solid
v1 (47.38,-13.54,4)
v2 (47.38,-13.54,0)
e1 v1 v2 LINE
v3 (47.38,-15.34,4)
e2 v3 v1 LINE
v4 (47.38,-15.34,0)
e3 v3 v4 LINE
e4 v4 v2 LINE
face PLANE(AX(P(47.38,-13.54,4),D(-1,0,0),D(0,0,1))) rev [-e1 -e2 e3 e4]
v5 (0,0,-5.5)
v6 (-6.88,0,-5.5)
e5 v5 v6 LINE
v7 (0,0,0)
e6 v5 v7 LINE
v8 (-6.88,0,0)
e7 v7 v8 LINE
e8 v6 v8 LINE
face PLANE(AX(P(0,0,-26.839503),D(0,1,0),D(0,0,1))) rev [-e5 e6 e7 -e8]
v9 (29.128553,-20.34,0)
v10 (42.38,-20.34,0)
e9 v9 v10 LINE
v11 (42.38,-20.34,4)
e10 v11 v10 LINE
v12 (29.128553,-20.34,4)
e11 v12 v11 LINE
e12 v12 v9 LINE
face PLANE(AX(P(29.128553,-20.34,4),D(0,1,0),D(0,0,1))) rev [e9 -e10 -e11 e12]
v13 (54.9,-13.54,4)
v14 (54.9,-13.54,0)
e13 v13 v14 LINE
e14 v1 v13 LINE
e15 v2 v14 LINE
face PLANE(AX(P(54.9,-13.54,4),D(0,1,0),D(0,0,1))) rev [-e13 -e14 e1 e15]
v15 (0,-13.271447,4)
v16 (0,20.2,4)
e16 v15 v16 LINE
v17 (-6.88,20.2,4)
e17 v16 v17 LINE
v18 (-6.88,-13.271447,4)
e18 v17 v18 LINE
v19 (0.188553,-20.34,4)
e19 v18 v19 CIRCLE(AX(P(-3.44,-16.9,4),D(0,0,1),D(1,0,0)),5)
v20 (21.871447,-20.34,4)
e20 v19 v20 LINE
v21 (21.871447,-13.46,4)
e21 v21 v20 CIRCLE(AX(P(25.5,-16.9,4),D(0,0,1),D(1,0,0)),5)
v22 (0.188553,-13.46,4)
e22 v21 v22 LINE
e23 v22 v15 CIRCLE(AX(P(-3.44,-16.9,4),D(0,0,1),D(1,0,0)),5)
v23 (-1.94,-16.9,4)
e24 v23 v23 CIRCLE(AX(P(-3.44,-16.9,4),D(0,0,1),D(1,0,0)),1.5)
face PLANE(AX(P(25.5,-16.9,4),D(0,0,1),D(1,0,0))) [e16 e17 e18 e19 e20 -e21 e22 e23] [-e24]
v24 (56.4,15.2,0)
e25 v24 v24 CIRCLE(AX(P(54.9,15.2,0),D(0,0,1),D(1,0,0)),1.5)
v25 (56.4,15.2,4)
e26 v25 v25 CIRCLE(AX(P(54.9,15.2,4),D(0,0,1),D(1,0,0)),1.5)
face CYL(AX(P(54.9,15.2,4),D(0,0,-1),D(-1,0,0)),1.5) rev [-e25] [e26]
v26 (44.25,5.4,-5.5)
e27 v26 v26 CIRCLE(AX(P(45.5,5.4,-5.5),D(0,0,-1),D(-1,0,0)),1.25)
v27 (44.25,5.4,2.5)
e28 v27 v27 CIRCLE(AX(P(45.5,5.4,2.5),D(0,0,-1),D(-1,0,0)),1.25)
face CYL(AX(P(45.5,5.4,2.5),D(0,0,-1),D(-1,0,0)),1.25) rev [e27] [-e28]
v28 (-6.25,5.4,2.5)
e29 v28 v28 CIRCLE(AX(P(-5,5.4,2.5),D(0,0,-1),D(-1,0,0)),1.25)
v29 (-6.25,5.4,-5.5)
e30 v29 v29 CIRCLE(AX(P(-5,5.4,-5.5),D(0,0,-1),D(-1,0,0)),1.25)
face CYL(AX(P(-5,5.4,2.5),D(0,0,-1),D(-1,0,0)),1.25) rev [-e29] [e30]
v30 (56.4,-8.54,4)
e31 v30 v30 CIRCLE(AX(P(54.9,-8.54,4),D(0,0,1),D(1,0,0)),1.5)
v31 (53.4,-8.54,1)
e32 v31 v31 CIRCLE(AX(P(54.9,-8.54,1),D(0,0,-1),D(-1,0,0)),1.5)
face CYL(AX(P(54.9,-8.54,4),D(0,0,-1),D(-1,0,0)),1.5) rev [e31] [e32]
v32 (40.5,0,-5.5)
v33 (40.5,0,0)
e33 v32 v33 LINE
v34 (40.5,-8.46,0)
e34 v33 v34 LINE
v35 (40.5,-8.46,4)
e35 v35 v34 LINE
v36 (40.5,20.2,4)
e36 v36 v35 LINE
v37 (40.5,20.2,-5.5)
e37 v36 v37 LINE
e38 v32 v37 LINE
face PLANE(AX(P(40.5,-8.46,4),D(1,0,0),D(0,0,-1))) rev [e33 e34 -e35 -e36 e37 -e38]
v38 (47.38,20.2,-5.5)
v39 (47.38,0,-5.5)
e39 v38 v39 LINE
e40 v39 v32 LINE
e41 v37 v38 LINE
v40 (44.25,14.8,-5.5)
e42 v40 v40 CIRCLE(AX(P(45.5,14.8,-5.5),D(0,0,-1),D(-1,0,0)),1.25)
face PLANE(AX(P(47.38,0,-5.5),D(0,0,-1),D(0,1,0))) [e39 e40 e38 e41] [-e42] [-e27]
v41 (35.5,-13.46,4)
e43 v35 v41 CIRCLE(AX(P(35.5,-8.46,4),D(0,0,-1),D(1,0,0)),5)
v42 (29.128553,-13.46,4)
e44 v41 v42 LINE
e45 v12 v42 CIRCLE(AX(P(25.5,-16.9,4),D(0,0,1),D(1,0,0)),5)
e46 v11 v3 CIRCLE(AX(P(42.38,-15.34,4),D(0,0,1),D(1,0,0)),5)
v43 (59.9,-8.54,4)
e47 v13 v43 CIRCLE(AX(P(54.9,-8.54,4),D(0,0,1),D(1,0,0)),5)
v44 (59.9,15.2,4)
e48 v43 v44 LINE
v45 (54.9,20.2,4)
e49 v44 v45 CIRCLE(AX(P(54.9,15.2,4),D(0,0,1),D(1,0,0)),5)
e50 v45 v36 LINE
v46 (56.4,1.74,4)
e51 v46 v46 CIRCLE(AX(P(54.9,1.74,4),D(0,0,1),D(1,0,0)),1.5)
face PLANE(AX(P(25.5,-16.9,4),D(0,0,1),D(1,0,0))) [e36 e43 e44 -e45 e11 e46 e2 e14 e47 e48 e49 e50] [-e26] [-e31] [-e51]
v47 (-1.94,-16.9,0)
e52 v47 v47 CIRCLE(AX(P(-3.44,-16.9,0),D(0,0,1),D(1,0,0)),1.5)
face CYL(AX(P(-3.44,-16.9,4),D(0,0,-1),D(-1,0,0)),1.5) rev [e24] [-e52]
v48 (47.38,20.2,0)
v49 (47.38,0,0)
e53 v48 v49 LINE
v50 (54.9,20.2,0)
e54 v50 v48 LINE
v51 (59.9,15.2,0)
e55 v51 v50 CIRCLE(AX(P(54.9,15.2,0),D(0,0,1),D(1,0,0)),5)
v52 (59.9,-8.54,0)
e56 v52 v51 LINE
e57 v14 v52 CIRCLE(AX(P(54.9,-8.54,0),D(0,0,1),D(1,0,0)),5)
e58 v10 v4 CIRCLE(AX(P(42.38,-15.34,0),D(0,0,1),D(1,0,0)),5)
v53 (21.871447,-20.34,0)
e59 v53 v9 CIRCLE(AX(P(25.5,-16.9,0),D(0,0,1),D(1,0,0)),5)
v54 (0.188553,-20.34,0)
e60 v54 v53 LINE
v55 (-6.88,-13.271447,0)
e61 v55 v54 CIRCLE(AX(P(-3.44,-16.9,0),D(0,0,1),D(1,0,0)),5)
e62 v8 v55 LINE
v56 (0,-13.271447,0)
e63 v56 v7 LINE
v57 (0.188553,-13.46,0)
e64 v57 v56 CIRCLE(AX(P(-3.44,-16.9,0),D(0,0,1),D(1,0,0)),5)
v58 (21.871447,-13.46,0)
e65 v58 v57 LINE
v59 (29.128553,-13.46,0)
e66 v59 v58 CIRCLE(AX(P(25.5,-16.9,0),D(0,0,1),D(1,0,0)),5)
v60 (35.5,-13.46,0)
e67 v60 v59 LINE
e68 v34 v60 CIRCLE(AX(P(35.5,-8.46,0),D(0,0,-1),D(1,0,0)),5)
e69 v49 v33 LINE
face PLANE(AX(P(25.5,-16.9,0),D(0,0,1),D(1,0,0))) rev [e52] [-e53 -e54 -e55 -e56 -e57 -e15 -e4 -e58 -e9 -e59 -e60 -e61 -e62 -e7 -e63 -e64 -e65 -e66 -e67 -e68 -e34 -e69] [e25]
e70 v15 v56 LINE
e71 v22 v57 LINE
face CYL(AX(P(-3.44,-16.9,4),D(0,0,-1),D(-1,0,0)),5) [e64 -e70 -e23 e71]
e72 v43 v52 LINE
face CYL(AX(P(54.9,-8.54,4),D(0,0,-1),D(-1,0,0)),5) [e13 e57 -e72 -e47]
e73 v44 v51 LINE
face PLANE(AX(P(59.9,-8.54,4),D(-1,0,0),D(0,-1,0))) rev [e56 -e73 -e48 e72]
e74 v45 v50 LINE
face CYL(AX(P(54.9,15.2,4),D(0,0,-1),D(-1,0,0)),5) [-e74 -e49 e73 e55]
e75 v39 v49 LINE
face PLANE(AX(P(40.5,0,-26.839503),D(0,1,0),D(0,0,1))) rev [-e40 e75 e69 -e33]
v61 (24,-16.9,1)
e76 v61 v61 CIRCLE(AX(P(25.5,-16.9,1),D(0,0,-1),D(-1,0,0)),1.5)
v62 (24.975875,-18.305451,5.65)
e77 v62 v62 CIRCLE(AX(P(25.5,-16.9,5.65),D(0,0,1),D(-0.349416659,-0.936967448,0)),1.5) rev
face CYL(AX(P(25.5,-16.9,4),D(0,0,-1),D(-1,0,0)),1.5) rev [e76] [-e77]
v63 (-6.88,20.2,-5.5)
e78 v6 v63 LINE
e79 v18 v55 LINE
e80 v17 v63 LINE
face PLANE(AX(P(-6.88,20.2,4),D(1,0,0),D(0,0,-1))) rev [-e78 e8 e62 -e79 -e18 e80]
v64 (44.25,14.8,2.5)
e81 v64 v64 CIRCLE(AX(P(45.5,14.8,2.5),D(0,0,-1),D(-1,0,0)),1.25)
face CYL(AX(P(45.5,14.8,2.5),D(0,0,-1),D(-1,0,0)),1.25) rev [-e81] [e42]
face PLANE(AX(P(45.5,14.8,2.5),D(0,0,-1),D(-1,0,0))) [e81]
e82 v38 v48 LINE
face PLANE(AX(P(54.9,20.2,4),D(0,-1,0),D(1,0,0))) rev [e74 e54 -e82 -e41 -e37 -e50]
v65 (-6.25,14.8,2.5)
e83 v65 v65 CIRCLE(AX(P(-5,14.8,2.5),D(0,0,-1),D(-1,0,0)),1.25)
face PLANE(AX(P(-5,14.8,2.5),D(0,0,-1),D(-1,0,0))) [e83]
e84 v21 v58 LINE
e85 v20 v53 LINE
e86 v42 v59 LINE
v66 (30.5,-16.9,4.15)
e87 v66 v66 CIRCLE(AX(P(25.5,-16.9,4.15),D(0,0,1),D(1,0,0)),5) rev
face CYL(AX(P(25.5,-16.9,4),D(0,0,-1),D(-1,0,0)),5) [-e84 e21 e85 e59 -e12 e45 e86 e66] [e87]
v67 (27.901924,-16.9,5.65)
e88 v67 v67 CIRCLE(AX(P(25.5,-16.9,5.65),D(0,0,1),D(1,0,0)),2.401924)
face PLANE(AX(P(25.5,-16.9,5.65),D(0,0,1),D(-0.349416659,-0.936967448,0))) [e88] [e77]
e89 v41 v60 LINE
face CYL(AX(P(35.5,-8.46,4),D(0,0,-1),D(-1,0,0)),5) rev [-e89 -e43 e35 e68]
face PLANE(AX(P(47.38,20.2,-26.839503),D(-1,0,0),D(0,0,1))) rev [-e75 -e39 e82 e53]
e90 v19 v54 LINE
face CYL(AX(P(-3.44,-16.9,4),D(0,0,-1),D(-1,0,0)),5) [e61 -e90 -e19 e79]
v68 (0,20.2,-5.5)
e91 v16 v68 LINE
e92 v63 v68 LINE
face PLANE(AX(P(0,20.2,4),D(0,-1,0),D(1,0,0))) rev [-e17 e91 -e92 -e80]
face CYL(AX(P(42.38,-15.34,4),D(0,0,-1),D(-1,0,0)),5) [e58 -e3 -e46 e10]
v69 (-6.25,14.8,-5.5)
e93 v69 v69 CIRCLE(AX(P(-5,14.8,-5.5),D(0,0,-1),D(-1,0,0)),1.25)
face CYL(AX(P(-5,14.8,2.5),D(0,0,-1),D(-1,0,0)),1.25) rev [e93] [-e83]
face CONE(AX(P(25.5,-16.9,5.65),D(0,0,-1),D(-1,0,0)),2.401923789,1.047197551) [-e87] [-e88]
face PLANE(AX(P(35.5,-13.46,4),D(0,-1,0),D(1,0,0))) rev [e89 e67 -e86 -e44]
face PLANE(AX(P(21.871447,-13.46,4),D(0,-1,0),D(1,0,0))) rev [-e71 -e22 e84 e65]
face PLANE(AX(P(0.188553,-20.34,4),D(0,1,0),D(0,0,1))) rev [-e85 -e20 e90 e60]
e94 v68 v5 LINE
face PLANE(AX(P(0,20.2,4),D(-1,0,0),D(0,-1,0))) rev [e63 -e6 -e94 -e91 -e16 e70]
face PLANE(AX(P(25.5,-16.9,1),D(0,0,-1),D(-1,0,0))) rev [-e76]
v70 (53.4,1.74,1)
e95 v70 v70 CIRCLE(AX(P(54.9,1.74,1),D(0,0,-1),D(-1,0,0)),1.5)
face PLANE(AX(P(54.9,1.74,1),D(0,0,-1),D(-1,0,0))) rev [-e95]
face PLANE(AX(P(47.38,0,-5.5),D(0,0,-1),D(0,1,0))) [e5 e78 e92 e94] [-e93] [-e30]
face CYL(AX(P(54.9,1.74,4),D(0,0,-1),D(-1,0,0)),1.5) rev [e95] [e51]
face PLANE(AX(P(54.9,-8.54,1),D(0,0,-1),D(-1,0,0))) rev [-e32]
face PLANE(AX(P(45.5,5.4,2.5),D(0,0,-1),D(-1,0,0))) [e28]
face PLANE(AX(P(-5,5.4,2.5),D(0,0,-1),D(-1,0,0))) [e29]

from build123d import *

# Parameters (mm, degrees)
CROQUIS1_R              = 1.5
SALIENTE_EXTRUIR1_DEPTH = 4
CROQUIS2_W              = 6.88
CROQUIS2_H              = 20.2
SALIENTE_EXTRUIR2_DEPTH = 5.5
CROQUIS3_R              = 5
CROQUIS3_R_2            = 1.5
SALIENTE_EXTRUIR3_DEPTH = 1.65
CROQUIS4_R              = 1.5
SALIENTE_EXTRUIR4_DEPTH = 1
CROQUIS5_R              = 1.25
CORTAR_EXTRUIR1_DEPTH   = 8


with BuildPart() as part:
    # Croquis1 → Saliente-Extruir1 (new body)
    with BuildSketch(Plane.XY):
        with BuildLine():
            Line((59.9, -8.54), (59.9, 15.2))
            ThreePointArc((59.9, 15.2), (58.435533906, 18.735533906), (54.9, 20.2))
            Line((54.9, 20.2), (40.5, 20.2))
            Line((40.5, 20.2), (40.5, -8.46))
            ThreePointArc((40.5, -8.46), (39.035533906, -11.995533906), (35.5, -13.46))
            Line((35.5, -13.46), (29.128553431, -13.46))
            ThreePointArc((29.128553431, -13.46), (25.5, -11.9), (21.871446569, -13.46))
            Line((21.871446569, -13.46), (0.188553431, -13.46))
            ThreePointArc((0.188553431, -13.46), (0.095533906, -13.364466094), (0, -13.271446569))
            Line((0, -13.271446569), (0, 20.2))
            Line((0, 20.2), (-6.88, 20.2))
            Line((-6.88, 20.2), (-6.88, -13.271446569))
            ThreePointArc((-6.88, -13.271446569), (-6.975533906, -20.435533906), (0.188553431, -20.34))
            Line((0.188553431, -20.34), (21.871446569, -20.34))
            ThreePointArc((21.871446569, -20.34), (25.5, -21.9), (29.128553431, -20.34))
            Line((29.128553431, -20.34), (42.38, -20.34))
            ThreePointArc((42.38, -20.34), (45.915533906, -18.875533906), (47.38, -15.34))
            Line((47.38, -15.34), (47.38, -13.54))
            Line((47.38, -13.54), (54.9, -13.54))
            ThreePointArc((54.9, -13.54), (58.435533906, -12.075533906), (59.9, -8.54))
        make_face()
        with Locations((54.9, 1.74)):
            Circle(CROQUIS1_R, mode=Mode.SUBTRACT)
        with Locations((54.9, -8.54)):
            Circle(CROQUIS1_R, mode=Mode.SUBTRACT)
        with Locations((25.5, -16.9)):
            Circle(CROQUIS1_R, mode=Mode.SUBTRACT)
        with Locations((-3.44, -16.9)):
            Circle(CROQUIS1_R, mode=Mode.SUBTRACT)
        with Locations((54.9, 15.2)):
            Circle(CROQUIS1_R, mode=Mode.SUBTRACT)
    extrude(amount=SALIENTE_EXTRUIR1_DEPTH)

    # Croquis2 → Saliente-Extruir2 (add)
    with BuildSketch(Plane(origin=(0, 0, 0), x_dir=(-1, 0, 0), z_dir=(0, 0, -1))):
        with Locations((-43.94, 10.1)):
            Rectangle(CROQUIS2_W, CROQUIS2_H)
        with Locations((3.44, 10.1)):
            Rectangle(CROQUIS2_W, CROQUIS2_H)
    extrude(amount=SALIENTE_EXTRUIR2_DEPTH)

    # Croquis3 → Saliente-Extruir3 (add)
    with BuildSketch(Plane.XY.offset(4)):
        with Locations(Location((25.5, -16.9, 0), (0, 0, 136.528000689))):
            Circle(CROQUIS3_R)
        with Locations(Location((25.5, -16.9, 0), (0, 0, 249.548360479))):
            Circle(CROQUIS3_R_2, mode=Mode.SUBTRACT)
    extrude(amount=SALIENTE_EXTRUIR3_DEPTH)

    # Croquis4 → Saliente-Extruir4 (add)
    with BuildSketch(Plane(origin=(0, 0, 0), x_dir=(-1, 0, 0), z_dir=(0, 0, -1))):
        with Locations((-25.5, -16.9)):
            Circle(CROQUIS4_R)
        with Locations((-54.9, 1.74)):
            Circle(CROQUIS4_R)
        with Locations((-54.9, -8.54)):
            Circle(CROQUIS4_R)
    extrude(amount=-SALIENTE_EXTRUIR4_DEPTH)

    # Croquis5 → Cortar-Extruir1 (cut)
    with BuildSketch(Plane(origin=(0, 0, -5.5), x_dir=(-1, 0, 0), z_dir=(0, 0, -1))):
        with Locations((-45.5, 5.4)):
            Circle(CROQUIS5_R)
        with Locations((-45.5, 14.8)):
            Circle(CROQUIS5_R)
        with Locations((5, 14.8)):
            Circle(CROQUIS5_R)
        with Locations((5, 5.4)):
            Circle(CROQUIS5_R)
    extrude(amount=-CORTAR_EXTRUIR1_DEPTH, mode=Mode.SUBTRACT)

    # Chaflán1: read off the stored shape, not the designer's step
    # Chaflán1 outline → Chaflán1 (revolve, cut)
    with BuildSketch(Plane(origin=(25.5, -16.9, 0), x_dir=(1, 0, 0), z_dir=(0, -1, 0))):
        Polygon((5, 5.65), (2.401923789, 5.65), (5, 4.15), align=None)
    revolve(axis=Axis((25.5, -16.9, 0), (0, 0, 1)), mode=Mode.SUBTRACT)


solid = part.part
